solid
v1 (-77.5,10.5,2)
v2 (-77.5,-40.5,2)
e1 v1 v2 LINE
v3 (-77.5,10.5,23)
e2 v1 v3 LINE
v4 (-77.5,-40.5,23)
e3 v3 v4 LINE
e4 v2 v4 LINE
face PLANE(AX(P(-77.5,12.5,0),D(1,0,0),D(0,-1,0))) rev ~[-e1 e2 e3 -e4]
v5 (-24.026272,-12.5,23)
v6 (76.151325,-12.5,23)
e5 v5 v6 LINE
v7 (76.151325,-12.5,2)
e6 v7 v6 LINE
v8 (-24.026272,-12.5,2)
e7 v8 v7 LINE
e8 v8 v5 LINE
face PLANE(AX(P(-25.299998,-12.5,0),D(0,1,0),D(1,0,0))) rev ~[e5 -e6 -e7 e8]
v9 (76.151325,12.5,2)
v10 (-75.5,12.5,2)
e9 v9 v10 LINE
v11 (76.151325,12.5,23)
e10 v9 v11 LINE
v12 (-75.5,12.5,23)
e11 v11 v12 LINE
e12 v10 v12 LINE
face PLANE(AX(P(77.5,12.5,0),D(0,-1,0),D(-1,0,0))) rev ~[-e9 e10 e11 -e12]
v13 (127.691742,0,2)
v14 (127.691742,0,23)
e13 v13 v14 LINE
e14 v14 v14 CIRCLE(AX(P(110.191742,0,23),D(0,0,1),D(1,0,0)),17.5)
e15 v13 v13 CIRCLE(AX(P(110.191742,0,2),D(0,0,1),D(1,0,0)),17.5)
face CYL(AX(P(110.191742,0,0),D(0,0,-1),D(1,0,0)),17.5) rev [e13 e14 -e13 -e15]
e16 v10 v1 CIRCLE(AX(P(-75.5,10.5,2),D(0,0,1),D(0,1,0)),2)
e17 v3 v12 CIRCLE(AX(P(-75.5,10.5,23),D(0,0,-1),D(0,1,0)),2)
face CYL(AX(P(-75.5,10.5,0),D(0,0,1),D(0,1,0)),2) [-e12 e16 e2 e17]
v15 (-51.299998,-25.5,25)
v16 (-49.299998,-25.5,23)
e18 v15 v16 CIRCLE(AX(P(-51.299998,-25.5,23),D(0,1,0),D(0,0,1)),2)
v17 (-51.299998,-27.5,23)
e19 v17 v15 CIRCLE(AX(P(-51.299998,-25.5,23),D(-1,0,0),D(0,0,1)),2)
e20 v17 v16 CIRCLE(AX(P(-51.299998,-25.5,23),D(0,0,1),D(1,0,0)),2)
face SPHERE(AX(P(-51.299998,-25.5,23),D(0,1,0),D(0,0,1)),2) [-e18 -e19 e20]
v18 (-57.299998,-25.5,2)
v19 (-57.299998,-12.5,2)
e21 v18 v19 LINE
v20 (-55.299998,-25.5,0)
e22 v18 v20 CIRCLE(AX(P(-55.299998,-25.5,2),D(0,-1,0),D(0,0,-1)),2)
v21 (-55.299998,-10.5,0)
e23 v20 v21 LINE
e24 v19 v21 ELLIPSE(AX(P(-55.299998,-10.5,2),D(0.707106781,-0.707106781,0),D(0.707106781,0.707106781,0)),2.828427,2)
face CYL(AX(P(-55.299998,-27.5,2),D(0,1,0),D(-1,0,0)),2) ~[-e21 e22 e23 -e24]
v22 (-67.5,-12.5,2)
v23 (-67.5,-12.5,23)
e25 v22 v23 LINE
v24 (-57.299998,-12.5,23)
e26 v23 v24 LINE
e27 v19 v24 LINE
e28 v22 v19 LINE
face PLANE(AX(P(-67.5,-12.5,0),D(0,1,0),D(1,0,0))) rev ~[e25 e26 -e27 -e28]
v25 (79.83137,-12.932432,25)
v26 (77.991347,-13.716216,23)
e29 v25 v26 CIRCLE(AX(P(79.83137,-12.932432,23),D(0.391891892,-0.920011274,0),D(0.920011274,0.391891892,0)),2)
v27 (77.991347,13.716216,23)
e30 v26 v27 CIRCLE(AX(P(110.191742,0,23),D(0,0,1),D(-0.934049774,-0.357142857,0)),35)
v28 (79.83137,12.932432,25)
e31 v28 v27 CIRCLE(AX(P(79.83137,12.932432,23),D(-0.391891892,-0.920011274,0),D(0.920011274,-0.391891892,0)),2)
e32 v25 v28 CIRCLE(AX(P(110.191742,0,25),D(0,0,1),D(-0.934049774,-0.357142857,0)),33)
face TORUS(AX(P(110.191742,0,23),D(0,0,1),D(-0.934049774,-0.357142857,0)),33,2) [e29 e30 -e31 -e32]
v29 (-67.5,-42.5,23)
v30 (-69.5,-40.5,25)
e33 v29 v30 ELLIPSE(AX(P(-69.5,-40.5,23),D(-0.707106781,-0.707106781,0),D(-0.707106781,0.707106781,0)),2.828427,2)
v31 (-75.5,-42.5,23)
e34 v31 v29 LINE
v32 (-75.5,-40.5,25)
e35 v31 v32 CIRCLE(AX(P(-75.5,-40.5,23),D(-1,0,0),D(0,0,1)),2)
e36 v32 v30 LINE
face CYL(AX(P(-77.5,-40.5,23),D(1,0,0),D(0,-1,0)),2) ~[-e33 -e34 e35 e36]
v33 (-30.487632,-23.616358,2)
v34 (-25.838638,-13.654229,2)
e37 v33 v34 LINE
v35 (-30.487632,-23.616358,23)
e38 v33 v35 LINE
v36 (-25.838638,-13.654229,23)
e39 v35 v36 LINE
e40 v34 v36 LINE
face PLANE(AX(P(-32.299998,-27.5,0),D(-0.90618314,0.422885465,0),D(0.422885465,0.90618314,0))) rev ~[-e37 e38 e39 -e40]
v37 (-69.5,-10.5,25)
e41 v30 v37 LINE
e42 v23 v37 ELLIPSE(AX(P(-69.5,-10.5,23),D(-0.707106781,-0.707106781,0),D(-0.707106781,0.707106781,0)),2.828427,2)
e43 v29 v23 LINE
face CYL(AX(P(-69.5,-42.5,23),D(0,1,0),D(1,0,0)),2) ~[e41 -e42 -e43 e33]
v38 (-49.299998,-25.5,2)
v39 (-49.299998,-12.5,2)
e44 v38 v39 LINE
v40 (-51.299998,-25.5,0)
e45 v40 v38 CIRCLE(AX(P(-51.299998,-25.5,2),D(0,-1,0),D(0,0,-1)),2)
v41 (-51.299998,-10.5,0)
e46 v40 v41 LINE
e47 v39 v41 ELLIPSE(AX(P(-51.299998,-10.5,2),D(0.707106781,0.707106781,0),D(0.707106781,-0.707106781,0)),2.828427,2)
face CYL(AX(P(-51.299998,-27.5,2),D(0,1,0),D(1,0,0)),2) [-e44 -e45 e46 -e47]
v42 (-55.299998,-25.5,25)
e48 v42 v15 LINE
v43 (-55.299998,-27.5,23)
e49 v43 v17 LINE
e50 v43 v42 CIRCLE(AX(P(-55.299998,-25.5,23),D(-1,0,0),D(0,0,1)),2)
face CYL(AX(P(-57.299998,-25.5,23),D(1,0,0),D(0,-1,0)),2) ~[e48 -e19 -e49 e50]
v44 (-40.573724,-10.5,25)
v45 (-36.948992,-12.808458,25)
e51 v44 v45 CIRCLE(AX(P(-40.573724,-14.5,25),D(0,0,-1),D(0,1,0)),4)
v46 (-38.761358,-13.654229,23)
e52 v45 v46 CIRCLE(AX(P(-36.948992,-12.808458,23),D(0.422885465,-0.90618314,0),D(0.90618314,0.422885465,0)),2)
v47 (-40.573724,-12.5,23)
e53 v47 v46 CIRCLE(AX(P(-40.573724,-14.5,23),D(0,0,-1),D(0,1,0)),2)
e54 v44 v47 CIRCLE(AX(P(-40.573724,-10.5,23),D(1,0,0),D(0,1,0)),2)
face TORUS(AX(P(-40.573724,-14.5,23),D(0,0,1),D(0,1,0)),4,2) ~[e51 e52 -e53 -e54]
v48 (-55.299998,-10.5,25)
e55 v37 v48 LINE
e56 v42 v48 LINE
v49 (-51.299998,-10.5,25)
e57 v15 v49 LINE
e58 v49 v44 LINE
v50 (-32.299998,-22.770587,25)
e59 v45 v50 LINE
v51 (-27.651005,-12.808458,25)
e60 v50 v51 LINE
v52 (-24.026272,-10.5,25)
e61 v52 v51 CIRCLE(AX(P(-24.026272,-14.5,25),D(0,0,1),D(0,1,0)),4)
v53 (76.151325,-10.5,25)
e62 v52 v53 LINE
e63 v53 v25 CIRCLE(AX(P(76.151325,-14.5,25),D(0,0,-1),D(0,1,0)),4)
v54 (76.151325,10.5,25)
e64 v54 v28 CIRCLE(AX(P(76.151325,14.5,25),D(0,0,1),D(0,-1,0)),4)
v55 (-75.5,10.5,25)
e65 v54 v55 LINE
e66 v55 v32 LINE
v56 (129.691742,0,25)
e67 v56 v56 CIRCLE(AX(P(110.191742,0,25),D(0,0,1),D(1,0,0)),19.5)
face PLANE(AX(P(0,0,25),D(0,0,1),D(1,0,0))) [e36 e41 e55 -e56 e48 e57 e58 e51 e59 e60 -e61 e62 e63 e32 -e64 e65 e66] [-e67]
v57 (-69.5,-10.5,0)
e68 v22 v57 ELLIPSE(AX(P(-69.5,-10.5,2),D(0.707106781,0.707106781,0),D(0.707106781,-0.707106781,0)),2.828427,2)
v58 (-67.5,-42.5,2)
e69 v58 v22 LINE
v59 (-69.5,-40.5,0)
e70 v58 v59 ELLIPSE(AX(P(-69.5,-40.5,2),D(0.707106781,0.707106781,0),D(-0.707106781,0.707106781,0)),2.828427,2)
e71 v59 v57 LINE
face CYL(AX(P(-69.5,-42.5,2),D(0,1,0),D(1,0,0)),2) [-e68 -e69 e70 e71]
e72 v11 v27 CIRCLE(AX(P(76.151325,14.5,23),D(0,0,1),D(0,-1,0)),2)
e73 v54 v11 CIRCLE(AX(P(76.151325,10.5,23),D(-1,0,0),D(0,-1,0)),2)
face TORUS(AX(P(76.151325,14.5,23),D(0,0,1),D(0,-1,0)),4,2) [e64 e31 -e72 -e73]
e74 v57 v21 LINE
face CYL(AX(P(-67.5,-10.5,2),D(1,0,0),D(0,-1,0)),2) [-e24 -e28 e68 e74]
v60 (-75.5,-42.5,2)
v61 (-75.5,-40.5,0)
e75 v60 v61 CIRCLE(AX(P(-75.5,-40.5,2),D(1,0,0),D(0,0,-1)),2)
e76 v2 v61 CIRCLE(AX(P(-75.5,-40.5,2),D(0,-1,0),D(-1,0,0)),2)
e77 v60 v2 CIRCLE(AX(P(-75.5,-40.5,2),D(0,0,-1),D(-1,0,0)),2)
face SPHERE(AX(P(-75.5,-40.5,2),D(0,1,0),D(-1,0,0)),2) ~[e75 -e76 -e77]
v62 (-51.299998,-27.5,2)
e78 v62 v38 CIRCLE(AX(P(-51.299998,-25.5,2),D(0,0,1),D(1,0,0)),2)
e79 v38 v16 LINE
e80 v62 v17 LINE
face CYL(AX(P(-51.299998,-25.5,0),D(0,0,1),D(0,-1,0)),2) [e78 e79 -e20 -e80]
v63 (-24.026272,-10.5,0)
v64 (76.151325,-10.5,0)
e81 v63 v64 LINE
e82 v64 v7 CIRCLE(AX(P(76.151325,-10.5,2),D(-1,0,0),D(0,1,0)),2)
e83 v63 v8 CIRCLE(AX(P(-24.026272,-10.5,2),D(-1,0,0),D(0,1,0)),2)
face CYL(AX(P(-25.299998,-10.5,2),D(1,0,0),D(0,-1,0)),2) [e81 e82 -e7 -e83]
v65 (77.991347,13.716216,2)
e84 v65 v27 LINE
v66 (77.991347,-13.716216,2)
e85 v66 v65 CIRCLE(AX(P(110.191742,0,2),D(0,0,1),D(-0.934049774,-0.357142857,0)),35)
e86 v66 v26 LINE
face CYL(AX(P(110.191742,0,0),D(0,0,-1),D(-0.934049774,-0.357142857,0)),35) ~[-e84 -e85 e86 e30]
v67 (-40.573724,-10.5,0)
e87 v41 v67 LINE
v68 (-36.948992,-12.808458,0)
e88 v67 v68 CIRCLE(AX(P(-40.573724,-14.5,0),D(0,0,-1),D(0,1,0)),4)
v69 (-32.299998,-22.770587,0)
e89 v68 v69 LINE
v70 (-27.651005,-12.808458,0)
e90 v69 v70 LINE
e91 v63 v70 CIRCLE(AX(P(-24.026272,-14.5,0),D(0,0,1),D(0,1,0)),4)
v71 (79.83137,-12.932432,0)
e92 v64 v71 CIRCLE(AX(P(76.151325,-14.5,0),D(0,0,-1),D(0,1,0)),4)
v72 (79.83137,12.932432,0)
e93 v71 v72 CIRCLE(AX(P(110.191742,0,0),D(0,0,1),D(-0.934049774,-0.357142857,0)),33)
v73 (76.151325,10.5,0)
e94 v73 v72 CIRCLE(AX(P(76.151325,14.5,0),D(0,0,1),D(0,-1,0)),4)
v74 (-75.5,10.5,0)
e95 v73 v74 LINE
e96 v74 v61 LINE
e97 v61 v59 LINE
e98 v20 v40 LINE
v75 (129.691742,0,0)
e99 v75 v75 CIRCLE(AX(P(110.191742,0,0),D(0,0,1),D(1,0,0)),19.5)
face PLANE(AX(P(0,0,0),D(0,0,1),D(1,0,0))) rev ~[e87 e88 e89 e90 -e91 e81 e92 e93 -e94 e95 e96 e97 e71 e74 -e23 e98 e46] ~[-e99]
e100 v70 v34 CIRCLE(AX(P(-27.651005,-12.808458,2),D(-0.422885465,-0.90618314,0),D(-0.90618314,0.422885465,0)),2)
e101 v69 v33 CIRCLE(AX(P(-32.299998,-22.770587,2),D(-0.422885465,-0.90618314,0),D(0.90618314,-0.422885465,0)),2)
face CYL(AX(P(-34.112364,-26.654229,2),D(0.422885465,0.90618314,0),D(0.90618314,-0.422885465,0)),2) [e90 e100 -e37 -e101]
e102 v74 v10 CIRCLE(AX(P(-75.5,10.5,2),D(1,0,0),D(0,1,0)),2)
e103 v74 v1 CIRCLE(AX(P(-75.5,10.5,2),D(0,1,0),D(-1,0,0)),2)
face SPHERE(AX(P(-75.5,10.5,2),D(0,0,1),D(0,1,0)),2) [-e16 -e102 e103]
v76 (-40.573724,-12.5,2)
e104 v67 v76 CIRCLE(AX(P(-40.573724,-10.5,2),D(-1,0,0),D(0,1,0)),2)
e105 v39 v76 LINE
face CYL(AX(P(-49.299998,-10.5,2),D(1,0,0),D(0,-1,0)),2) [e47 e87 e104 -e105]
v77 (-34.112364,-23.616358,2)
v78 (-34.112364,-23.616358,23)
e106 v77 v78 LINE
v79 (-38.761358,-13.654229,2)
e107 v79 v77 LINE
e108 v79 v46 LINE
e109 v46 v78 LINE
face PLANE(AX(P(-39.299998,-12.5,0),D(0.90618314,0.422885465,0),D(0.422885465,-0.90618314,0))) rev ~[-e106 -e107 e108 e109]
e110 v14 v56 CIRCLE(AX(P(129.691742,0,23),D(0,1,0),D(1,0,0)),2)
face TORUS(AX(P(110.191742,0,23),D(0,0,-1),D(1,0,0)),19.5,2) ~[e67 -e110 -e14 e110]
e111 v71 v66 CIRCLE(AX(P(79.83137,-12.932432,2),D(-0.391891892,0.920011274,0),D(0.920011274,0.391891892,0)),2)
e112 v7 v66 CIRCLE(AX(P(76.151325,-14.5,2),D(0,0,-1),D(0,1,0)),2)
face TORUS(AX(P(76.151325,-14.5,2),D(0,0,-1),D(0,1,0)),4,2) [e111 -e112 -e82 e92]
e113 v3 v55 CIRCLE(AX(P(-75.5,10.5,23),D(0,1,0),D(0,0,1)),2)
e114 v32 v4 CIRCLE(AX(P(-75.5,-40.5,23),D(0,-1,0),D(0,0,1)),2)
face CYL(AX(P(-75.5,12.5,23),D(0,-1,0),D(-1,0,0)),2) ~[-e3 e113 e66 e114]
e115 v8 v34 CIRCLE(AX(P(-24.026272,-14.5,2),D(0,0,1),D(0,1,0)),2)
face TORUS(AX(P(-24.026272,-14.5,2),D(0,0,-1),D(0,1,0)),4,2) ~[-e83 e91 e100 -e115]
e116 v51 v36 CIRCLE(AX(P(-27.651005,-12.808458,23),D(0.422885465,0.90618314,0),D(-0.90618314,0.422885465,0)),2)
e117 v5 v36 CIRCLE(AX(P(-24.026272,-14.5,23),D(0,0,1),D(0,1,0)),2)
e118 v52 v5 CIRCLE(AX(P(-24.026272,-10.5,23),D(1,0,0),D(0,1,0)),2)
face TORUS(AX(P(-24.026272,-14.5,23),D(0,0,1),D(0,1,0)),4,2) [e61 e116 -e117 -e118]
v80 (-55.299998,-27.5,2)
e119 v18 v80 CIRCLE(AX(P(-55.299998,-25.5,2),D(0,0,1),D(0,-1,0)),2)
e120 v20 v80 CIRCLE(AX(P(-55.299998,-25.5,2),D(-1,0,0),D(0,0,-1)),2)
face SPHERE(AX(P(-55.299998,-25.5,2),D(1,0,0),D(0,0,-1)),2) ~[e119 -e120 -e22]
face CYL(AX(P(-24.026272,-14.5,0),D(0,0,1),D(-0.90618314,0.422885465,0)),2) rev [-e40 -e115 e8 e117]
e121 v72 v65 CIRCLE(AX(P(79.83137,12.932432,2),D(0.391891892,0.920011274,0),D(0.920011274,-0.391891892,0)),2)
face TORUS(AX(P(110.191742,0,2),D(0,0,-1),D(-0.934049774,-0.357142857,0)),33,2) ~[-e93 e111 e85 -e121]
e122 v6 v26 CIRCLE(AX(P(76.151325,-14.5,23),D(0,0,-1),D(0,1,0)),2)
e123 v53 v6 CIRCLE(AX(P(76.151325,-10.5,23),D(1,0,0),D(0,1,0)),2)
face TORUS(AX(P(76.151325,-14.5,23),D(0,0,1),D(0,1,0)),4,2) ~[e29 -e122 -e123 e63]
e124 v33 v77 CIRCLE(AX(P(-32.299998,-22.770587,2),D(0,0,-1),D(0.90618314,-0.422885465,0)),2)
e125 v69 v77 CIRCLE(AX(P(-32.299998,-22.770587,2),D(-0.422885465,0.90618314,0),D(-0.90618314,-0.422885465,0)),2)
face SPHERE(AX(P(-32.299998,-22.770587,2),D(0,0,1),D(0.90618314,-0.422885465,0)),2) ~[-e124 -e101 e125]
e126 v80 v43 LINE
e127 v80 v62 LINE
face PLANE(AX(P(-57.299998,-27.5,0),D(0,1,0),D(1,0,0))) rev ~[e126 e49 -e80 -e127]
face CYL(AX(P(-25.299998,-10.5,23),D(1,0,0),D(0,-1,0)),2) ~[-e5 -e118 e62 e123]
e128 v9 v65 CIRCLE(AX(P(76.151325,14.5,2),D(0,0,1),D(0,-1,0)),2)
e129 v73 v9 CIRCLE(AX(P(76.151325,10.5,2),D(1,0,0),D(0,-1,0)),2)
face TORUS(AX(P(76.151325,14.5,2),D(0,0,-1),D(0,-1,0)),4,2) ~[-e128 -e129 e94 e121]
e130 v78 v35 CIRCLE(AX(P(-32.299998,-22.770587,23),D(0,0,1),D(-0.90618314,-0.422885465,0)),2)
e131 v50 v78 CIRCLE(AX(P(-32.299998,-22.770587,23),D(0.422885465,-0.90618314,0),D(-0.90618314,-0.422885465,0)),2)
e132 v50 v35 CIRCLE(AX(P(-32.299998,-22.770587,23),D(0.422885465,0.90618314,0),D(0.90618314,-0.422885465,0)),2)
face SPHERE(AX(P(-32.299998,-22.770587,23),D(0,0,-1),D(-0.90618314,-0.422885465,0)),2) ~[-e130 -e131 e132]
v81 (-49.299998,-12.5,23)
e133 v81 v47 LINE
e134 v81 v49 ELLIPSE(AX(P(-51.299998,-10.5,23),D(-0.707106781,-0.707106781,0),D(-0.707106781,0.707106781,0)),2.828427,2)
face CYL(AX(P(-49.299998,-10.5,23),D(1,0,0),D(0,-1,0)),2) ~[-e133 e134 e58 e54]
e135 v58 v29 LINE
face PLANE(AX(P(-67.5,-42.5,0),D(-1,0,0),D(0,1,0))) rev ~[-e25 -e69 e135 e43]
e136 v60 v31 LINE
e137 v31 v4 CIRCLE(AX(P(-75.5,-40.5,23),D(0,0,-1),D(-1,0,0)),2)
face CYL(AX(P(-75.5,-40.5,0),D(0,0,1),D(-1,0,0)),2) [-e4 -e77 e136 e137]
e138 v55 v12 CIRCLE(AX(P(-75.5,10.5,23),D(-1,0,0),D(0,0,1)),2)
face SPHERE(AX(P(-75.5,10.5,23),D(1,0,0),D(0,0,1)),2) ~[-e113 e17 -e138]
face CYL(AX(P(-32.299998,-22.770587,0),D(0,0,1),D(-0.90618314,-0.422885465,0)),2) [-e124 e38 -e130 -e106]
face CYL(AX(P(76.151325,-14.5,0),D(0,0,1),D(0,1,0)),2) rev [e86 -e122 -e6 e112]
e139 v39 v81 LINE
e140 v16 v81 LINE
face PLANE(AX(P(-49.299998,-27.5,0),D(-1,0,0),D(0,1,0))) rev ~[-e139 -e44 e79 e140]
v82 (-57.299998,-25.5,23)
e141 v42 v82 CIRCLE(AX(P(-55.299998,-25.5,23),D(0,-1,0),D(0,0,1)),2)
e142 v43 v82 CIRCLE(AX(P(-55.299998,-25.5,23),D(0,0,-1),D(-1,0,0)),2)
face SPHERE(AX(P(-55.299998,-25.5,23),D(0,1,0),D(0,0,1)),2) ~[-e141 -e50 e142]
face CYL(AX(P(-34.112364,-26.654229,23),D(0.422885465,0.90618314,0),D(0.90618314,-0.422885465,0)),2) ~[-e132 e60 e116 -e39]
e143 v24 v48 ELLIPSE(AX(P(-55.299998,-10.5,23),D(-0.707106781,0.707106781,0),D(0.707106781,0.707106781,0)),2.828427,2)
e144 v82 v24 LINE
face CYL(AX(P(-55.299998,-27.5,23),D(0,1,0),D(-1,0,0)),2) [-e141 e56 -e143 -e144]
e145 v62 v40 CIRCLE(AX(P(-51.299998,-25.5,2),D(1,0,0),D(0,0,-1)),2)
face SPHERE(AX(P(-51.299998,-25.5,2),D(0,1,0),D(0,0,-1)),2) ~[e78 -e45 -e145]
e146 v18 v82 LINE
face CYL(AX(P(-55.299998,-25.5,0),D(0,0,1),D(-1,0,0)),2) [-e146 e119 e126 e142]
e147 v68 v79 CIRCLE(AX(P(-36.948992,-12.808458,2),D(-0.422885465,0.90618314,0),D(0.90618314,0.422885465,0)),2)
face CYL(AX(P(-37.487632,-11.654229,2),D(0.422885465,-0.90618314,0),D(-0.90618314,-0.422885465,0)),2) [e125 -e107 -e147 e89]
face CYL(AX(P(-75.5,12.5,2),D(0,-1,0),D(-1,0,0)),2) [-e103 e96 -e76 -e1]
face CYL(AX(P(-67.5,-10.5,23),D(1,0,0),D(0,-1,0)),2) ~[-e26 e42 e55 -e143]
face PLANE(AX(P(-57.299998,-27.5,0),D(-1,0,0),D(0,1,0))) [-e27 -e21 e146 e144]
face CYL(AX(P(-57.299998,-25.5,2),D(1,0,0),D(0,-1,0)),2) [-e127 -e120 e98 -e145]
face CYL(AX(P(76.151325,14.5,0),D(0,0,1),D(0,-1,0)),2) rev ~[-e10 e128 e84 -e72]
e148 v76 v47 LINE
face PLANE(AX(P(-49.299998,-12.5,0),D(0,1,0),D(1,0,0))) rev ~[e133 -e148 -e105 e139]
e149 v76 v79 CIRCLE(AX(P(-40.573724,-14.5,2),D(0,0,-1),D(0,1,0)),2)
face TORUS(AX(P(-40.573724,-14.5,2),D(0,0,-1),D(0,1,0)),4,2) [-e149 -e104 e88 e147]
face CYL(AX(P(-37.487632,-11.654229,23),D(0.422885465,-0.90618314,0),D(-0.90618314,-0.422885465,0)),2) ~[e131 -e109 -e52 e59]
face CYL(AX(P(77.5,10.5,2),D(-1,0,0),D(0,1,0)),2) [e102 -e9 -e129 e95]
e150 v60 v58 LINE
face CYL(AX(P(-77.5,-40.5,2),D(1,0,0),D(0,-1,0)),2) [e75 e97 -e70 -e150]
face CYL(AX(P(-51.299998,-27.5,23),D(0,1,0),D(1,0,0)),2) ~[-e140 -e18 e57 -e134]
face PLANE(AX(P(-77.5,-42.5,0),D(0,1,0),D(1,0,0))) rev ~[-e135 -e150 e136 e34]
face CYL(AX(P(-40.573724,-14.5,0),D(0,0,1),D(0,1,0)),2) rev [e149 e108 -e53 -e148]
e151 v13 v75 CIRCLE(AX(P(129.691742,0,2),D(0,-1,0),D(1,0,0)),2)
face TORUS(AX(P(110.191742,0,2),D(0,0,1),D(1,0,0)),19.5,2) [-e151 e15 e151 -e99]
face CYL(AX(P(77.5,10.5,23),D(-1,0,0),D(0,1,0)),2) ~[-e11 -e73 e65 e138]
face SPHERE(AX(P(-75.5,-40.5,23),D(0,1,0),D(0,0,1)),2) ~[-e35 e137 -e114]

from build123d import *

# Parameters (mm, degrees)
F0_R     = 17.5
F0_W     = 10
F0_H     = 30
F0_W_2   = 8
F0_H_2   = 15
F1_DEPTH = 25
F2_R     = 2


with BuildPart() as f1:
    # F0 (on Top) → F1 (new body)
    with BuildSketch(Plane.XY):
        Polygon((77.5, -12.5), (77.5, 12.5), (-77.5, 12.5), (-77.5, -12.5), (-67.5, -12.5), (-57.2999980922, -12.5), (-49.2999980922, -12.5), (-39.2999980922, -12.5), (-25.2999980922, -12.5), align=None)
        with BuildLine():
            ThreePointArc((77.5, -12.5), (145.1917420766, 0), (77.5, 12.5))
            Line((77.5, 12.5), (77.5, -12.5))
        make_face()
        with Locations((110.1917420766, 0)):
            Circle(F0_R, mode=Mode.SUBTRACT)
        with Locations((-72.5, -27.5)):
            Rectangle(F0_W, F0_H)
        Polygon((-32.2999980922, -27.5), (-25.2999980922, -12.5), (-39.2999980922, -12.5), align=None)
        with Locations((-53.2999980922, -20)):
            Rectangle(F0_W_2, F0_H_2)
    extrude(amount=F1_DEPTH)

    # F2
    f2_edges = [f1.edges().sort_by_distance(p)[0] for p in [
        (0, 12.5, 25),
        (-77.5, -15, 25),
        (-67.5, -27.5, 25),
        (-72.5, -42.5, 25),
        (-62.399999, -12.5, 25),
        (-57.299998, -20, 25),
        (-49.299998, -20, 25),
        (-53.299998, -27.5, 25),
        (-35.799998, -20, 25),
        (26.100001, -12.5, 25),
        (-28.799998, -20, 25),
        (145.191742, 0, 25),
        (92.691742, 0, 25),
        (145.191742, 0, 0),
        (77.5, 12.5, 12.5),
        (77.5, -12.5, 12.5),
        (-77.5, 12.5, 12.5),
        (0, 12.5, 0),
        (92.691742, 0, 0),
        (26.100001, -12.5, 0),
        (-28.799998, -20, 0),
        (-44.299998, -12.5, 0),
        (-35.799998, -20, 0),
        (-49.299998, -20, 0),
        (-53.299998, -27.5, 0),
        (-57.299998, -20, 0),
        (-62.399999, -12.5, 0),
        (-67.5, -27.5, 0),
        (-77.5, -15, 0),
        (-77.5, -42.5, 12.5),
        (-32.299998, -27.5, 12.5),
        (-25.299998, -12.5, 12.5),
        (-39.299998, -12.5, 12.5),
        (-57.299998, -27.5, 12.5),
        (-49.299998, -27.5, 12.5),
        (-72.5, -42.5, 0),
        (-44.299998, -12.5, 25),
    ]]
    fillet(f2_edges, radius=F2_R)


solid = f1.part
